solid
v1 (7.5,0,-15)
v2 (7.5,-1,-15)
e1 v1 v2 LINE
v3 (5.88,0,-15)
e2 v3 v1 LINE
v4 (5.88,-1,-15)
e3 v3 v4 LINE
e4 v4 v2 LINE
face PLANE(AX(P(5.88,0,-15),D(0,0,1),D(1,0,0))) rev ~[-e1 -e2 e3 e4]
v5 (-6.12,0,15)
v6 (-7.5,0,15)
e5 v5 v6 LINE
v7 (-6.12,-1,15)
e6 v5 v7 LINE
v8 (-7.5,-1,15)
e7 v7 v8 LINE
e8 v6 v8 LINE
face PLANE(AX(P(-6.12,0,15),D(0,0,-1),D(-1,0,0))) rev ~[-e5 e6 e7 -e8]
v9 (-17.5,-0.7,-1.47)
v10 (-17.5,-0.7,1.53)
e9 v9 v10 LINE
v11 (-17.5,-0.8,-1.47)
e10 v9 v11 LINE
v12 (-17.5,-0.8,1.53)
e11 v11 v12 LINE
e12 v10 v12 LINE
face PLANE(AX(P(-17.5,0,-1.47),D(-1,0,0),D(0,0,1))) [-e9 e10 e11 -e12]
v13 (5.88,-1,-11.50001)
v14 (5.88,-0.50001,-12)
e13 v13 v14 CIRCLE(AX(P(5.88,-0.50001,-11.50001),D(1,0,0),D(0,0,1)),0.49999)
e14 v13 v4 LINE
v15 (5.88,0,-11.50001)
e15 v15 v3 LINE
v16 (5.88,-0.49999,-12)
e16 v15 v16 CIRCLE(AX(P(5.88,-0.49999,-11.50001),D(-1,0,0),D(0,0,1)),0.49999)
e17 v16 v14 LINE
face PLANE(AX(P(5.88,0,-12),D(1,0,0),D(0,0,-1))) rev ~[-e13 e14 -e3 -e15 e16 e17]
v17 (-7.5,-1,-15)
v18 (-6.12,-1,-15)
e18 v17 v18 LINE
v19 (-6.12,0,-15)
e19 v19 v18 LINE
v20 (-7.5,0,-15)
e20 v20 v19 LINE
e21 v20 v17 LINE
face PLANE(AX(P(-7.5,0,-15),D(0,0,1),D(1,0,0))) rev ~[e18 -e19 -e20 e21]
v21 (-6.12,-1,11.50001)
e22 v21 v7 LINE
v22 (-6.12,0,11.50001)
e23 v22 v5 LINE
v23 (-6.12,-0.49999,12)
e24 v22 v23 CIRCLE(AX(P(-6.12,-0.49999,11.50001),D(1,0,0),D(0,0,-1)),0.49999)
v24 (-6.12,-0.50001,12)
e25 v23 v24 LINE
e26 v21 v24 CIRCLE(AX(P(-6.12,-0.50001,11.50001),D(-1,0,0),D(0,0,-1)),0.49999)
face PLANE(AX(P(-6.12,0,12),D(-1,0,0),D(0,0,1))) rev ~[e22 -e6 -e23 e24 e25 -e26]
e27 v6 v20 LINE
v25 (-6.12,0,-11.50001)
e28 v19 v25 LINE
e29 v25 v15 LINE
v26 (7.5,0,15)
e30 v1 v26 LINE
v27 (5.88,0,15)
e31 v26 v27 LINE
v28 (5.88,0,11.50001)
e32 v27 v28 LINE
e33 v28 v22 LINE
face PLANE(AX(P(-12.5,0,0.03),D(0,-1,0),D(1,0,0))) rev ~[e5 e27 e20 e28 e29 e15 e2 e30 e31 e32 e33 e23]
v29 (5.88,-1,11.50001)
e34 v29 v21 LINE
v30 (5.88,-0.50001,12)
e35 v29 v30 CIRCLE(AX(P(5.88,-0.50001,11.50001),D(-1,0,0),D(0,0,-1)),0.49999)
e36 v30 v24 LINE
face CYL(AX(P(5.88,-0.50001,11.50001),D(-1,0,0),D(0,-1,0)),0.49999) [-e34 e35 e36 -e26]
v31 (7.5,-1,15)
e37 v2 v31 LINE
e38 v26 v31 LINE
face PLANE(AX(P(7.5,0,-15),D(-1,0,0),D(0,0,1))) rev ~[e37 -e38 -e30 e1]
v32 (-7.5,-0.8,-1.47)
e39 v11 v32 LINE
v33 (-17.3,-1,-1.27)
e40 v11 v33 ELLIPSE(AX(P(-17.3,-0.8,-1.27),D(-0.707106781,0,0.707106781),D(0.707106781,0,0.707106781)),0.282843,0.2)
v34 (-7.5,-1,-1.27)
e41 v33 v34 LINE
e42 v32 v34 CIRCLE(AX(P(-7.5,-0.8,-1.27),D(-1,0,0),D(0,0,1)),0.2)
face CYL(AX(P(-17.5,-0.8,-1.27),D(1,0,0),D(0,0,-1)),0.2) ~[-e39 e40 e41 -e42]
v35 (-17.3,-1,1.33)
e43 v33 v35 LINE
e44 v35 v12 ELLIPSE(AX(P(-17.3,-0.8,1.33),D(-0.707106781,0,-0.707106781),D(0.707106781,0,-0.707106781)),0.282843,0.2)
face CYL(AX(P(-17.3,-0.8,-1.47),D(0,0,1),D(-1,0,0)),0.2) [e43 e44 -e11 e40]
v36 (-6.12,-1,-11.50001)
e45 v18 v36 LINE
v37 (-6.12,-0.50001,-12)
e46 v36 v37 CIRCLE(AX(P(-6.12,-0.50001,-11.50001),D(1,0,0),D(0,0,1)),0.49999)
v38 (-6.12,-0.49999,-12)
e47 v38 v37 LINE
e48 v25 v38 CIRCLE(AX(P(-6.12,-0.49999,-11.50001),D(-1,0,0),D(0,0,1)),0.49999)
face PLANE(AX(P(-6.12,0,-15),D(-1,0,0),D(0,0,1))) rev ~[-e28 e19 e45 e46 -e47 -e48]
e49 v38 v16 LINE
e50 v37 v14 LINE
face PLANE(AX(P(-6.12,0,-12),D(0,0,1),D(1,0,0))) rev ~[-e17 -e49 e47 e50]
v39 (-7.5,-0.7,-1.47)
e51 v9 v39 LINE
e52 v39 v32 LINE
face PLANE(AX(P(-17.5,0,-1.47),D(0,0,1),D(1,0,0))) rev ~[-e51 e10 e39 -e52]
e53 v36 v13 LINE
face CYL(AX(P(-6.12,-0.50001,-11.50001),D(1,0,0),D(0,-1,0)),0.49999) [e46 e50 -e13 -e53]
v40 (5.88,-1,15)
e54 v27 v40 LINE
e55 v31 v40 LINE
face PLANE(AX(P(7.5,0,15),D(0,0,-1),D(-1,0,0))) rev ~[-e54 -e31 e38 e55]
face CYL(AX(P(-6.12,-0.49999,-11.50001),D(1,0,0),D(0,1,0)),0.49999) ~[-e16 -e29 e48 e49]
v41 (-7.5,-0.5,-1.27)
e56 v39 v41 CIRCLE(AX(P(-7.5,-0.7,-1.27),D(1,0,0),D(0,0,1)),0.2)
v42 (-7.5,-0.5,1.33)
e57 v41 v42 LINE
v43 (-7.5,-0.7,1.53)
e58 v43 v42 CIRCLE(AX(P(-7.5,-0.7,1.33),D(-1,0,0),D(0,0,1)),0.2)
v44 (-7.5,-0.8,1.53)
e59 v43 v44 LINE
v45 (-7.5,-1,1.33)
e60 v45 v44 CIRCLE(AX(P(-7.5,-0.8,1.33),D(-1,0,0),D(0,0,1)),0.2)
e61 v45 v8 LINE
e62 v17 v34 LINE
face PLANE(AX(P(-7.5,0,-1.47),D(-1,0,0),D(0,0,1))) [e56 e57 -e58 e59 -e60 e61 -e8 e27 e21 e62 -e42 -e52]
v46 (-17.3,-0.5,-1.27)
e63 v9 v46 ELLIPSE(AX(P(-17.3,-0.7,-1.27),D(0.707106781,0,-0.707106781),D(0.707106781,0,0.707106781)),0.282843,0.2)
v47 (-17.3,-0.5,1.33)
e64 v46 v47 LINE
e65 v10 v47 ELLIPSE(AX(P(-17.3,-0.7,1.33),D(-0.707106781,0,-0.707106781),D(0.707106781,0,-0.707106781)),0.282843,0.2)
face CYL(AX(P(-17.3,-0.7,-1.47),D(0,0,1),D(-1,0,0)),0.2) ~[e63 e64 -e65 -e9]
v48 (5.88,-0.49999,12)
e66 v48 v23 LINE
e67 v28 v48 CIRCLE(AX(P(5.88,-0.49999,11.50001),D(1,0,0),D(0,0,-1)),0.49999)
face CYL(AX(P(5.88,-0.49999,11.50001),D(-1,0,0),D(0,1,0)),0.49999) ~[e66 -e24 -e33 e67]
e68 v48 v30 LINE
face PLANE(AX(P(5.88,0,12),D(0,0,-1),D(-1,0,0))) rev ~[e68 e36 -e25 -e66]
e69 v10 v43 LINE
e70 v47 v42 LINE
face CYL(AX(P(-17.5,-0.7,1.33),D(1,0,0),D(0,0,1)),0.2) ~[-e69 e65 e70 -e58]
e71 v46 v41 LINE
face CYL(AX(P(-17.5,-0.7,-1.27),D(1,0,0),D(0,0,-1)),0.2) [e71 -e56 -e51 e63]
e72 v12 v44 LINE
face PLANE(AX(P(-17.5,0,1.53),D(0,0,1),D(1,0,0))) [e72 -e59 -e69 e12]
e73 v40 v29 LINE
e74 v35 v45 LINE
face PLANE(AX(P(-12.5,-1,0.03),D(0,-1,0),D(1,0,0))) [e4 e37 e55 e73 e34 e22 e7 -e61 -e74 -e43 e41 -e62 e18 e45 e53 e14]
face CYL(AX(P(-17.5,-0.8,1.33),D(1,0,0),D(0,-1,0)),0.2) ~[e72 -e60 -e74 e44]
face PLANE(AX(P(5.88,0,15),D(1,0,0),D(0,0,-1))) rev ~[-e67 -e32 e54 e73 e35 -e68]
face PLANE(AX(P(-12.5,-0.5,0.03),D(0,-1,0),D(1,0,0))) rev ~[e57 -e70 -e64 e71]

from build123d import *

# Parameters (mm, degrees)
F0_W     = 10
F0_H     = 3
F1_DEPTH = 1
F2_DEPTH = 0.5
F3_R     = 0.2
F4_R     = 0.49999


# Not quite as in the source:
# - a fillet or chamfer is up to 0.001 mm smaller than in the source, because OpenCascade refuses the exact size


with BuildPart() as f1:
    # F0 (on Front) → F1 (new body)
    with BuildSketch(Plane.XZ):
        with Locations((-12.5, 0.0299999826)):
            Rectangle(F0_W, F0_H)
        Polygon((-6.1200000346, 15), (-7.5, 15), (-7.5, 1.5299999826), (-7.5, -1.4700000174), (-7.5, -15), (-6.1200000346, -15), (-6.1200000346, -12), (5.8799999654, -12), (5.8799999654, -15), (7.5, -15), (7.5, 15), (5.8799999654, 15), (5.8799999654, 12), (-6.1200000346, 12), align=None)
    extrude(amount=F1_DEPTH)

    # F0 (on Front) → F2 (cut)
    with BuildSketch(Plane.XZ):
        with Locations((-12.5, 0.0299999826)):
            Rectangle(F0_W, F0_H)
    extrude(amount=F2_DEPTH, mode=Mode.SUBTRACT)

    # F3
    f3_edges = [f1.edges().sort_by_distance(p)[0] for p in [
        (-12.5, -0.5, -1.47),
        (-12.5, -0.5, 1.53),
        (-12.5, -1, -1.47),
        (-12.5, -1, 1.53),
        (-17.5, -1, 0.03),
        (-17.5, -0.5, 0.03),
    ]]
    fillet(f3_edges, radius=F3_R)

    # F4 (radius 0.5 in the source; OpenCascade refuses exactly that, so slightly less here)
    f4_edges = [f1.edges().sort_by_distance(p)[0] for p in [
        (-0.12, -1, -12),
        (-0.12, -1, 12),
        (-0.12, 0, -12),
        (-0.12, 0, 12),
    ]]
    fillet(f4_edges, radius=F4_R)


solid = f1.part
